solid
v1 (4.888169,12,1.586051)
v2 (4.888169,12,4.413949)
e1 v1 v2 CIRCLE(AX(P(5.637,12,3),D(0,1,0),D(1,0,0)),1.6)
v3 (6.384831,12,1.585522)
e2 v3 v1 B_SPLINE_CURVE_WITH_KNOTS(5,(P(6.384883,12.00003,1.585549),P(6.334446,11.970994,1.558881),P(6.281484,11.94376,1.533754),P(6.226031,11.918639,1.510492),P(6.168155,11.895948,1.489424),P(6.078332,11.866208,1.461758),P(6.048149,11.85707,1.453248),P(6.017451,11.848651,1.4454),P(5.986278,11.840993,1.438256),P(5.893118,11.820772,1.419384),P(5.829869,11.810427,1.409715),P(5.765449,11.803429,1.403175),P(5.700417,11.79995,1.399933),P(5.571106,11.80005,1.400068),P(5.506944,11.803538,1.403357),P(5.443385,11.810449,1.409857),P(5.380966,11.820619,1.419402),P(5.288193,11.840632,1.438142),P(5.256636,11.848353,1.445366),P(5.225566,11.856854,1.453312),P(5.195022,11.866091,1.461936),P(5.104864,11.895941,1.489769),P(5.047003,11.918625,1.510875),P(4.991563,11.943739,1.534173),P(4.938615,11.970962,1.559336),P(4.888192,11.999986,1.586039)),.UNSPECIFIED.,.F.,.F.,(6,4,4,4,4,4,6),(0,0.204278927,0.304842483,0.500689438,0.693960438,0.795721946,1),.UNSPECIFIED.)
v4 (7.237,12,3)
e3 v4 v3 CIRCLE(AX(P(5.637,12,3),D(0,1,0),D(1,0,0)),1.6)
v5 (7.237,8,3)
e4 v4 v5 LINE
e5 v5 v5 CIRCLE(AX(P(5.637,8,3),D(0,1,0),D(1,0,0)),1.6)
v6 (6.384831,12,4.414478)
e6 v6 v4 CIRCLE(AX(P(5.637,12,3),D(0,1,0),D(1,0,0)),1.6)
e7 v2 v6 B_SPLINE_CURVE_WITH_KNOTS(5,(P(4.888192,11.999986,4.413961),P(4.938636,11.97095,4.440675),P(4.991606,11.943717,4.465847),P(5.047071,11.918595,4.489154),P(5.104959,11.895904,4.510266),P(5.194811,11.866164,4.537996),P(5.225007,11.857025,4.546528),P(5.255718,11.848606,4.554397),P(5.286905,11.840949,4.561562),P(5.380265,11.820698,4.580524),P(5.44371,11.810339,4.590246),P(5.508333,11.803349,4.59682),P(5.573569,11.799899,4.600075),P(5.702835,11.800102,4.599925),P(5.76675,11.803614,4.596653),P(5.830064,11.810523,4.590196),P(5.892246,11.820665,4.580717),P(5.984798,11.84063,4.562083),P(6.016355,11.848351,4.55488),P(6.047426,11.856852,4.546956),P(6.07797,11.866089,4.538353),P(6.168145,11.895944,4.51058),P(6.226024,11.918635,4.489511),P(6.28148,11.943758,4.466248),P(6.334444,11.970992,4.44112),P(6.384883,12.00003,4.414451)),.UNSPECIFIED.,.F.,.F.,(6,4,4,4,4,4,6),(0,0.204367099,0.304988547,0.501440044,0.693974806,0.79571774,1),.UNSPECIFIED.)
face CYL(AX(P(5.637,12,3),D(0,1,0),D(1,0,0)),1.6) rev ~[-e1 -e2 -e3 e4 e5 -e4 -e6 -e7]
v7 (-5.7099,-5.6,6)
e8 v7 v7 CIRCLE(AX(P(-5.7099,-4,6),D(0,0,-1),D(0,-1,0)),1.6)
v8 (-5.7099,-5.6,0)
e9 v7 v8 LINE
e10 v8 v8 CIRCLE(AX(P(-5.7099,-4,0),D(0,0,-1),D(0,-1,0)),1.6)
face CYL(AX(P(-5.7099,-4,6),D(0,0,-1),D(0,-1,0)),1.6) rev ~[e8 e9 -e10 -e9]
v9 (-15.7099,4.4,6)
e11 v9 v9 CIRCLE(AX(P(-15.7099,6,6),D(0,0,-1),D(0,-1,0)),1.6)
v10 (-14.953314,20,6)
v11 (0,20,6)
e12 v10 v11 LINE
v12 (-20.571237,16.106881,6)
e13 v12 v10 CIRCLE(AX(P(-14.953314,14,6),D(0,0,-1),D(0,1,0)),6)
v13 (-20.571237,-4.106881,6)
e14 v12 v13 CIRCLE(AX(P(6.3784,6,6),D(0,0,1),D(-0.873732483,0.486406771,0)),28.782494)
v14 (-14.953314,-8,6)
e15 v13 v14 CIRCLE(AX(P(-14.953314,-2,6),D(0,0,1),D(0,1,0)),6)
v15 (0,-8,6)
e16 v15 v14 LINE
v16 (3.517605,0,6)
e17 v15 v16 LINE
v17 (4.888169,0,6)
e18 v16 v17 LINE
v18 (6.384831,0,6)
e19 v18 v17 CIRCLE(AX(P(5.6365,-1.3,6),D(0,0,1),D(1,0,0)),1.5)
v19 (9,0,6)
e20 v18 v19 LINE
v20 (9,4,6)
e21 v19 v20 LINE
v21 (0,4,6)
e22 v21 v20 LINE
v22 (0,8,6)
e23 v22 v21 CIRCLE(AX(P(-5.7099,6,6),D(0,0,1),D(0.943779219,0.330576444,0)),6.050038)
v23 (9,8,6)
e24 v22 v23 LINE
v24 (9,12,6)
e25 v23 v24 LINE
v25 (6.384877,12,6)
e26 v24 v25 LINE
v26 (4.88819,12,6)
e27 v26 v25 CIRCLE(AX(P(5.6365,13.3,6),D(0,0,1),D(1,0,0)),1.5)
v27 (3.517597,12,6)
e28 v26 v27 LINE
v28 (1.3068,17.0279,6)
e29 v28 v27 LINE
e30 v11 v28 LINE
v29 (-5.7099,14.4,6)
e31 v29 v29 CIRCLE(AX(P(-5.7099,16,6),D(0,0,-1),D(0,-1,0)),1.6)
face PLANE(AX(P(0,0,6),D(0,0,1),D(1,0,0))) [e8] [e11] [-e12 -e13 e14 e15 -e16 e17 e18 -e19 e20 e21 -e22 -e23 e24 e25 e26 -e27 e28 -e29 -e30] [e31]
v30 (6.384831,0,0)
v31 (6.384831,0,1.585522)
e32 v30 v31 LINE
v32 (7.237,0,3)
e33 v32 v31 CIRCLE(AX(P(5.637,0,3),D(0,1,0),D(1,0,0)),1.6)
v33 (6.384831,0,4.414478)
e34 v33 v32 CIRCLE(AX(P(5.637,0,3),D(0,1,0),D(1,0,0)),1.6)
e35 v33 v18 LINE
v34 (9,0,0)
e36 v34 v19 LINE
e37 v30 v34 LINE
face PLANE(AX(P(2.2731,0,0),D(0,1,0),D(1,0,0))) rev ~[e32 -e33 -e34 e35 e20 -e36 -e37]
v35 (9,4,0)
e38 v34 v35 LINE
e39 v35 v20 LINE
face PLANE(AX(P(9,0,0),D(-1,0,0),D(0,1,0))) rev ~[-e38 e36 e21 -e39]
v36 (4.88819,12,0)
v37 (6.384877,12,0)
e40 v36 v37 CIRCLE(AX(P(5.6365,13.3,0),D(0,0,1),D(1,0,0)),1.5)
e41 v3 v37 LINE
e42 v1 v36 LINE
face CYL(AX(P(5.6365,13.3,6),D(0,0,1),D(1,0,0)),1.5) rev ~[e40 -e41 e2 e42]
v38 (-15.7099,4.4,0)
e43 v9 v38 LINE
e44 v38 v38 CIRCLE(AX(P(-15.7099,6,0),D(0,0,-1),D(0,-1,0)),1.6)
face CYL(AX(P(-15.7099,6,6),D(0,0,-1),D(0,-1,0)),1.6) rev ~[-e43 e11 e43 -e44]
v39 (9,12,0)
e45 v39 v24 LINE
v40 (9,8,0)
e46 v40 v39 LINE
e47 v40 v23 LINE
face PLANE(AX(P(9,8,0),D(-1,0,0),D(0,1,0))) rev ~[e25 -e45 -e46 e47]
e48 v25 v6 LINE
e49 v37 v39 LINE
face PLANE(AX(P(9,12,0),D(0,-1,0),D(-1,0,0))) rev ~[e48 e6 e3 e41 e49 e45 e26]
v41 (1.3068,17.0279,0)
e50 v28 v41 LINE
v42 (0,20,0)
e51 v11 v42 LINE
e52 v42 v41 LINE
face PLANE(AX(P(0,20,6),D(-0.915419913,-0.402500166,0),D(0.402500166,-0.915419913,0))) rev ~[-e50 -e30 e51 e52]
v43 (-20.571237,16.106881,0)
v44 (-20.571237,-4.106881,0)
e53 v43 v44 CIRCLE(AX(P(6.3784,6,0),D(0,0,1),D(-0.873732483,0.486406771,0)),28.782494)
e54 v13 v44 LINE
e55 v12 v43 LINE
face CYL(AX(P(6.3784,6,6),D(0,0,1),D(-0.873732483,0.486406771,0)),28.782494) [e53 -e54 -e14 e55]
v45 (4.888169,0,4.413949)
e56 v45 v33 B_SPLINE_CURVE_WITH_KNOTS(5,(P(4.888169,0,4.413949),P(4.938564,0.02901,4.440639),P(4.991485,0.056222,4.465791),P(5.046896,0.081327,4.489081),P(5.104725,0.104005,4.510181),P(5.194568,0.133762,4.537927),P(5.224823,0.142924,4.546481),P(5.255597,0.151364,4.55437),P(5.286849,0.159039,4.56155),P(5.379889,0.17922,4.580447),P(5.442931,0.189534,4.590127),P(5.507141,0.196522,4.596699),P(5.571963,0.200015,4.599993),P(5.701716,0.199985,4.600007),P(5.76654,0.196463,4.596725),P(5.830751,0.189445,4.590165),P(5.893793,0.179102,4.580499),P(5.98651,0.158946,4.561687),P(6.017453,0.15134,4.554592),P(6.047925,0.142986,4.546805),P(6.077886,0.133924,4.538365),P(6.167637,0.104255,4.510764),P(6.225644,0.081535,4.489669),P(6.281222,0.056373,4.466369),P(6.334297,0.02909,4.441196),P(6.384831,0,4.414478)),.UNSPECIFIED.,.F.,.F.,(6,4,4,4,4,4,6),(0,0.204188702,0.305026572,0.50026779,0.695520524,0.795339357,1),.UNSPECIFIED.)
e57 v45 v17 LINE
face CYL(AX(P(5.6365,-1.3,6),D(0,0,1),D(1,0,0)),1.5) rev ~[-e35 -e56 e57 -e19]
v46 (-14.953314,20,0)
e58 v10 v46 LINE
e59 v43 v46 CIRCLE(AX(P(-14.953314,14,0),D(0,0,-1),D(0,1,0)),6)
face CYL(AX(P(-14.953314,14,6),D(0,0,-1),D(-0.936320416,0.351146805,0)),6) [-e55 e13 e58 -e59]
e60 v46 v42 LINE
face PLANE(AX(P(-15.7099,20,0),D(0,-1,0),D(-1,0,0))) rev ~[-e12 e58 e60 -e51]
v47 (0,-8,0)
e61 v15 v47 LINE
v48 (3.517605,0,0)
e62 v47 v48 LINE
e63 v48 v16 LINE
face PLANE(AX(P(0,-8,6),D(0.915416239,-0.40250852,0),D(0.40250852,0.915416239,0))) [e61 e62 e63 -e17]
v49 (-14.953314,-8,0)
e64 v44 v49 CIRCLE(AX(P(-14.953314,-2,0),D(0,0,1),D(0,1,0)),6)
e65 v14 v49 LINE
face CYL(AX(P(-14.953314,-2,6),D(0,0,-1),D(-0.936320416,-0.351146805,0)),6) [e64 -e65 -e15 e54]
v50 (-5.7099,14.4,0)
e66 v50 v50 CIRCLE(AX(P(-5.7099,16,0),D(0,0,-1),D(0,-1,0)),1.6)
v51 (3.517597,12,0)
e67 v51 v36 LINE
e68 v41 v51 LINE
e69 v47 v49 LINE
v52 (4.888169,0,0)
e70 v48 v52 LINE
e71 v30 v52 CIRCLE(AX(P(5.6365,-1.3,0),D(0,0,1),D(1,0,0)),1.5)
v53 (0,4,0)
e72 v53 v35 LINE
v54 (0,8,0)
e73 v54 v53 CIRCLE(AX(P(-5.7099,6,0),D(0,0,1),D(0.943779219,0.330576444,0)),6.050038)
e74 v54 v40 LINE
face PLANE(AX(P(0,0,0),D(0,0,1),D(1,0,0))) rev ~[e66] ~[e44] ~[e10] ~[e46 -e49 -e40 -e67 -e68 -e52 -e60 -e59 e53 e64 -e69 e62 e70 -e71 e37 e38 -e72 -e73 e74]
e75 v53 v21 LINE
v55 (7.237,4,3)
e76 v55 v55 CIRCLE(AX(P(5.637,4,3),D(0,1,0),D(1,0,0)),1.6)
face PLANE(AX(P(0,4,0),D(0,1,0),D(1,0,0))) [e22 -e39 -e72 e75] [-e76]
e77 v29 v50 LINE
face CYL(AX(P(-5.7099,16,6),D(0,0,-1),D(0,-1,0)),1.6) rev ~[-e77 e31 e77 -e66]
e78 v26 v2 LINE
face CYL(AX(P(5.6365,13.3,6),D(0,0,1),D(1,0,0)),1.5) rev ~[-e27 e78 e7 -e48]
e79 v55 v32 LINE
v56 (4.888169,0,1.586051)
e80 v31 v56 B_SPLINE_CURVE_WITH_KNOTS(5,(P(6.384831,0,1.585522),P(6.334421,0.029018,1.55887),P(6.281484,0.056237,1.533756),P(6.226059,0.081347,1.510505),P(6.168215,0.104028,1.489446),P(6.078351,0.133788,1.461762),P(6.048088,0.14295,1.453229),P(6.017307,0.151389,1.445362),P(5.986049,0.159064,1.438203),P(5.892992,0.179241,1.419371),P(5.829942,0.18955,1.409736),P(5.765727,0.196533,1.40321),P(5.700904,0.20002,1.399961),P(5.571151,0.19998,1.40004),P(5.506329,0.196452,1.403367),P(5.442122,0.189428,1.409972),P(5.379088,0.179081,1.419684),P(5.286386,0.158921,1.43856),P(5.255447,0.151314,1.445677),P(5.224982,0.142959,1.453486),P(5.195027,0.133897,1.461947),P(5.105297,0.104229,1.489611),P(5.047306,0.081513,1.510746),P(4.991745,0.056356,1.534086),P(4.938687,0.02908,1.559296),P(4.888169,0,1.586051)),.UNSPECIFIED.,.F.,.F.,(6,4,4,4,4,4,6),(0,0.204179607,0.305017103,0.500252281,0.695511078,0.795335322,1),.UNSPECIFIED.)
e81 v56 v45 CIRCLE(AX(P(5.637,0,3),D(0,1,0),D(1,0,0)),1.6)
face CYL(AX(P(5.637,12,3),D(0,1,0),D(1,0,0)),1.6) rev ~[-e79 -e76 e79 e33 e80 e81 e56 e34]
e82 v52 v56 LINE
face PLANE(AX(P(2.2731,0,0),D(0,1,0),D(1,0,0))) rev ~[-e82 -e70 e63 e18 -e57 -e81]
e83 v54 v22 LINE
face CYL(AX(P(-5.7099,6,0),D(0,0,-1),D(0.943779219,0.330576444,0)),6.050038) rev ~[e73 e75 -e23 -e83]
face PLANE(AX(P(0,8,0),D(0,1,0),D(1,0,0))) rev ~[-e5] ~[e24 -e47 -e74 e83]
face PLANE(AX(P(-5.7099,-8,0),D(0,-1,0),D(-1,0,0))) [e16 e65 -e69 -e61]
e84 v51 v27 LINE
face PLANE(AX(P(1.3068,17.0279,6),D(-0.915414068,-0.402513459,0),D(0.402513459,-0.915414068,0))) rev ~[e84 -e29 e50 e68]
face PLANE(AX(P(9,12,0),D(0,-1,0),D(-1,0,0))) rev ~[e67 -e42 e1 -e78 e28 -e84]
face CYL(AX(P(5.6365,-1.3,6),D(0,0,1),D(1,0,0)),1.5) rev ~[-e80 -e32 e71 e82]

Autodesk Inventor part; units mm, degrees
ref_plane "YZ Plane" through (0, 0, 0) normal (1, 0, 0) x (0, 1, 0)
ref_plane "XZ Plane" through (0, 0, 0) normal (0, 1, 0) x (-1, 0, 0)
ref_plane "XY Plane" through (0, 0, 0) normal (0, 0, 1) x (1, 0, 0)
sketch "スケッチ1" plane through (0, 0, 0) normal (0, 0, 1) x (1, 0, 0)
  line L0 (9, 0) -> (9, 4)
  line L1 (9, 12) -> (2.2731, 12)
  line L2 (0, 8) -> (9, 8)
  line L3 (0, 4) -> (9, 4)
  line L4 (9, 8) -> (9, 12)
  arc A0 (0, 8) -> (0, 4) centre (-5.7099, 6) ccw
  line L5 (2.2731, 12) -> (0, 14.2779)
  line L6 (2.2731, 0) -> (-5.7099, -8)
  line L7 (-5.7099, 20) -> (-15.7099, 20)
  line L8 (-5.7099, -8) -> (-15.7099, -8)
  line L9 (-15.7099, 20) -> (-25.7698, 20)
  line L10 (-25.7698, 20) -> (-25.7698, -8)
  line L11 (-25.7698, -8) -> (-15.7099, -8)
  line L12 (2.2731, 0) -> (9, 0)
  line L13 (0, 14.2779) -> (-5.7099, 20)
  point P0 (0, 0)
  point P1 (4.5, 12)
  point P2 (4.5, 0)
  point P3 (4.5, 4)
  point P4 (-25.7099, 6)
  dimension "d4" = 12.1
  dimension "d5" = 4
  dimension "d6" = 14
  dimension "d7" = 14
  dimension "d8" = 10
  dimension "d9" = 10
  dimension "d10" = 20
  dimension "d12" = 14
extrude "押し出し1" add sketch "スケッチ1" along normal blind 6
sketch "スケッチ2" plane through (0, 0, 6) normal (0, 0, 1) x (1, 0, 0)
  circle A0 centre (5.6365, 13.3) radius 1.5
  line L0 (9, 8) -> (9, 12) projected
  line L1 (11.5477, 6) -> (-28.1936, 6) construction
  line L2 (9, 12) -> (2.2731, 12) projected
  circle A1 centre (5.6365, -1.3) radius 1.5
  point P0 (0, 0)
  point P1 (4.8882, 12)
  point P2 (6.3849, 12)
  dimension "d15" = 3
  dimension "d16" = 3.3635
  dimension "d17" = 1.3
extrude "押し出し2" cut sketch "スケッチ2" against normal blind 6 contours A0 L2 | A1 picked at (5.4614, 13.0013)
sketch "スケッチ3" plane through (0, 0, 6) normal (0, 0, 1) x (1, 0, 0)
  circle A0 centre (5.6365, 13.3) radius 1.5
  line L0 (9, 12) -> (2.2731, 12) projected
  point P0 (0, 0)
  point P1 (4.8882, 12)
  point P2 (6.3849, 12)
  dimension "d20" = 3
  dimension "d21" = 1.3
extrude "押し出し3" add sketch "スケッチ3" against normal blind 6 contours A0 L0 picked at (5.4614, 13.0013)
sketch "スケッチ4" plane through (0, 0, 6) normal (0, 0, 1) x (1, 0, 0)
  arc A0 (6.3849, 12) -> (4.8882, 12) centre (5.6365, 13.3) ccw projected
  circle A1 centre (5.6365, 13.3) radius 1.5
  point P0 (0, 0)
  dimension "d24" = 3
extrude "押し出し4" cut sketch "スケッチ4" against normal blind 6
fillet "フィレット1" radius 5 1 edges at (-25.7698, 20, 3)
fillet "フィレット2" radius 5 1 edges at (-25.7698, -8, 3)
fillet "フィレット3" radius 3 4 edges at (-5.7099, -8, 3) (2.2731, 0, 3) (-5.7099, 20, 3) (2.2731, 12, 3)
sketch "スケッチ6" plane through (0, 4, 0) normal (0, 1, 0) x (1, 0, 0)
  point P0 (0, 0)
sketch "スケッチ7" plane through (4.8882, 12, 6) normal (0, 1, 0) x (1, 0, 0)
  circle A0 centre (0.7488, 3) radius 1.6
  line L0 (1.4967, 0) -> (0, 0) projected
  line L1 (4.1118, 6) -> (4.1118, 0) projected
  point P0 (-4.8882, 6)
  point P1 (0.7483, 0)
  dimension "d43" = 3.2
  dimension "d44" = 3
  dimension "d45" = 3.363
extrude "押し出し5" cut sketch "スケッチ7" against normal blind 28
sketch "スケッチ11" plane through (0, 0, 6) normal (0, 0, 1) x (1, 0, 0)
  line L0 (-6.9544, 20) -> (-20.7698, 20) projected
  line L1 (-20.7698, 20) -> (-6.9544, 20)
  arc A0 (1.394, 12.8809) -> (3.5176, 12) centre (3.5176, 15) ccw projected
  line L2 (0, 20) -> (1.3068, 17.0279)
  arc A1 (1.394, 12.8809) -> (3.5176, 12) centre (3.5176, 15) ccw
  arc A2 (-4.8308, 19.1191) -> (-6.9544, 20) centre (-6.9544, 17) ccw projected
  arc A3 (-4.8308, 19.1191) -> (-6.9544, 20) centre (-6.9544, 17) ccw
  line L3 (1.394, 12.8809) -> (-4.8308, 19.1191) projected
  line L4 (-4.8308, 19.1191) -> (1.394, 12.8809)
  arc A4 (0, 8) -> (0, 4) centre (-5.7099, 6) ccw projected
  line L5 (-11.7599, 6) -> (12.1155, 6) construction
  line L6 (-20.7698, -8) -> (0, -8)
  line L7 (0, -8) -> (3.5176, 0)
  arc A5 (-6.9544, -8) -> (-4.8308, -7.1191) centre (-6.9544, -5) ccw
  line L8 (1.394, -0.8809) -> (-4.8308, -7.1191)
  line L9 (-6.9544, 20) -> (0, 20)
  line L10 (1.3068, 17.0279) -> (3.5176, 12)
  arc A6 (3.5176, 0) -> (1.394, -0.8809) centre (3.5176, -3) ccw
  point P0 (0, 0)
extrude "押し出し6" add sketch "スケッチ11" against normal blind 6
sketch "スケッチ12" plane through (0, 0, 6) normal (0, 0, 1) x (1, 0, 0)
  arc A0 (0, 8) -> (0, 4) centre (-5.7099, 6) ccw projected
  point P0 (0, 0)
  point P1 (-15.7099, 6)
  point P2 (-5.7099, 16)
  point P3 (-5.7099, -4)
  dimension "d74" = 10
  dimension "d76" = 10
  dimension "d77" = 10
hole "穴4" at (-15.7099, 6, 6) at (-5.7099, 16, 6) at (-5.7099, -4, 6) direction (0, 0, -1) diameter 3.2 end through all
sketch "スケッチ13" plane through (0, 0, 6) normal (0, 0, 1) x (1, 0, 0)
  line L0 (-20.7698, -8) -> (0, -8) projected
  line L1 (0, 20) -> (-20.7698, 20) projected
  line L2 (-18.7698, 20) -> (-18.7698, -8) construction
  line L3 (-25.7698, 15) -> (-25.7698, -3) projected
  arc A0 (-18.7698, 20) -> (-18.7698, -8) centre (6.3784, 6) ccw
  line L4 (-18.7698, 20) -> (-29.3351, 20)
  line L5 (-29.3351, 20) -> (-29.3351, -8)
  line L6 (-29.3351, -8) -> (-18.7698, -8)
  point P0 (0, 0)
  dimension "d85" = 7
extrude "押し出し7" cut sketch "スケッチ13" against normal blind 6
fillet "フィレット4" radius 6 1 edges at (-18.7698, 20, 3)
fillet "フィレット5" radius 6 1 edges at (-18.7698, -8, 3)
properties part number "射出_腕固定" material "ポリカーボネート、クリア"
